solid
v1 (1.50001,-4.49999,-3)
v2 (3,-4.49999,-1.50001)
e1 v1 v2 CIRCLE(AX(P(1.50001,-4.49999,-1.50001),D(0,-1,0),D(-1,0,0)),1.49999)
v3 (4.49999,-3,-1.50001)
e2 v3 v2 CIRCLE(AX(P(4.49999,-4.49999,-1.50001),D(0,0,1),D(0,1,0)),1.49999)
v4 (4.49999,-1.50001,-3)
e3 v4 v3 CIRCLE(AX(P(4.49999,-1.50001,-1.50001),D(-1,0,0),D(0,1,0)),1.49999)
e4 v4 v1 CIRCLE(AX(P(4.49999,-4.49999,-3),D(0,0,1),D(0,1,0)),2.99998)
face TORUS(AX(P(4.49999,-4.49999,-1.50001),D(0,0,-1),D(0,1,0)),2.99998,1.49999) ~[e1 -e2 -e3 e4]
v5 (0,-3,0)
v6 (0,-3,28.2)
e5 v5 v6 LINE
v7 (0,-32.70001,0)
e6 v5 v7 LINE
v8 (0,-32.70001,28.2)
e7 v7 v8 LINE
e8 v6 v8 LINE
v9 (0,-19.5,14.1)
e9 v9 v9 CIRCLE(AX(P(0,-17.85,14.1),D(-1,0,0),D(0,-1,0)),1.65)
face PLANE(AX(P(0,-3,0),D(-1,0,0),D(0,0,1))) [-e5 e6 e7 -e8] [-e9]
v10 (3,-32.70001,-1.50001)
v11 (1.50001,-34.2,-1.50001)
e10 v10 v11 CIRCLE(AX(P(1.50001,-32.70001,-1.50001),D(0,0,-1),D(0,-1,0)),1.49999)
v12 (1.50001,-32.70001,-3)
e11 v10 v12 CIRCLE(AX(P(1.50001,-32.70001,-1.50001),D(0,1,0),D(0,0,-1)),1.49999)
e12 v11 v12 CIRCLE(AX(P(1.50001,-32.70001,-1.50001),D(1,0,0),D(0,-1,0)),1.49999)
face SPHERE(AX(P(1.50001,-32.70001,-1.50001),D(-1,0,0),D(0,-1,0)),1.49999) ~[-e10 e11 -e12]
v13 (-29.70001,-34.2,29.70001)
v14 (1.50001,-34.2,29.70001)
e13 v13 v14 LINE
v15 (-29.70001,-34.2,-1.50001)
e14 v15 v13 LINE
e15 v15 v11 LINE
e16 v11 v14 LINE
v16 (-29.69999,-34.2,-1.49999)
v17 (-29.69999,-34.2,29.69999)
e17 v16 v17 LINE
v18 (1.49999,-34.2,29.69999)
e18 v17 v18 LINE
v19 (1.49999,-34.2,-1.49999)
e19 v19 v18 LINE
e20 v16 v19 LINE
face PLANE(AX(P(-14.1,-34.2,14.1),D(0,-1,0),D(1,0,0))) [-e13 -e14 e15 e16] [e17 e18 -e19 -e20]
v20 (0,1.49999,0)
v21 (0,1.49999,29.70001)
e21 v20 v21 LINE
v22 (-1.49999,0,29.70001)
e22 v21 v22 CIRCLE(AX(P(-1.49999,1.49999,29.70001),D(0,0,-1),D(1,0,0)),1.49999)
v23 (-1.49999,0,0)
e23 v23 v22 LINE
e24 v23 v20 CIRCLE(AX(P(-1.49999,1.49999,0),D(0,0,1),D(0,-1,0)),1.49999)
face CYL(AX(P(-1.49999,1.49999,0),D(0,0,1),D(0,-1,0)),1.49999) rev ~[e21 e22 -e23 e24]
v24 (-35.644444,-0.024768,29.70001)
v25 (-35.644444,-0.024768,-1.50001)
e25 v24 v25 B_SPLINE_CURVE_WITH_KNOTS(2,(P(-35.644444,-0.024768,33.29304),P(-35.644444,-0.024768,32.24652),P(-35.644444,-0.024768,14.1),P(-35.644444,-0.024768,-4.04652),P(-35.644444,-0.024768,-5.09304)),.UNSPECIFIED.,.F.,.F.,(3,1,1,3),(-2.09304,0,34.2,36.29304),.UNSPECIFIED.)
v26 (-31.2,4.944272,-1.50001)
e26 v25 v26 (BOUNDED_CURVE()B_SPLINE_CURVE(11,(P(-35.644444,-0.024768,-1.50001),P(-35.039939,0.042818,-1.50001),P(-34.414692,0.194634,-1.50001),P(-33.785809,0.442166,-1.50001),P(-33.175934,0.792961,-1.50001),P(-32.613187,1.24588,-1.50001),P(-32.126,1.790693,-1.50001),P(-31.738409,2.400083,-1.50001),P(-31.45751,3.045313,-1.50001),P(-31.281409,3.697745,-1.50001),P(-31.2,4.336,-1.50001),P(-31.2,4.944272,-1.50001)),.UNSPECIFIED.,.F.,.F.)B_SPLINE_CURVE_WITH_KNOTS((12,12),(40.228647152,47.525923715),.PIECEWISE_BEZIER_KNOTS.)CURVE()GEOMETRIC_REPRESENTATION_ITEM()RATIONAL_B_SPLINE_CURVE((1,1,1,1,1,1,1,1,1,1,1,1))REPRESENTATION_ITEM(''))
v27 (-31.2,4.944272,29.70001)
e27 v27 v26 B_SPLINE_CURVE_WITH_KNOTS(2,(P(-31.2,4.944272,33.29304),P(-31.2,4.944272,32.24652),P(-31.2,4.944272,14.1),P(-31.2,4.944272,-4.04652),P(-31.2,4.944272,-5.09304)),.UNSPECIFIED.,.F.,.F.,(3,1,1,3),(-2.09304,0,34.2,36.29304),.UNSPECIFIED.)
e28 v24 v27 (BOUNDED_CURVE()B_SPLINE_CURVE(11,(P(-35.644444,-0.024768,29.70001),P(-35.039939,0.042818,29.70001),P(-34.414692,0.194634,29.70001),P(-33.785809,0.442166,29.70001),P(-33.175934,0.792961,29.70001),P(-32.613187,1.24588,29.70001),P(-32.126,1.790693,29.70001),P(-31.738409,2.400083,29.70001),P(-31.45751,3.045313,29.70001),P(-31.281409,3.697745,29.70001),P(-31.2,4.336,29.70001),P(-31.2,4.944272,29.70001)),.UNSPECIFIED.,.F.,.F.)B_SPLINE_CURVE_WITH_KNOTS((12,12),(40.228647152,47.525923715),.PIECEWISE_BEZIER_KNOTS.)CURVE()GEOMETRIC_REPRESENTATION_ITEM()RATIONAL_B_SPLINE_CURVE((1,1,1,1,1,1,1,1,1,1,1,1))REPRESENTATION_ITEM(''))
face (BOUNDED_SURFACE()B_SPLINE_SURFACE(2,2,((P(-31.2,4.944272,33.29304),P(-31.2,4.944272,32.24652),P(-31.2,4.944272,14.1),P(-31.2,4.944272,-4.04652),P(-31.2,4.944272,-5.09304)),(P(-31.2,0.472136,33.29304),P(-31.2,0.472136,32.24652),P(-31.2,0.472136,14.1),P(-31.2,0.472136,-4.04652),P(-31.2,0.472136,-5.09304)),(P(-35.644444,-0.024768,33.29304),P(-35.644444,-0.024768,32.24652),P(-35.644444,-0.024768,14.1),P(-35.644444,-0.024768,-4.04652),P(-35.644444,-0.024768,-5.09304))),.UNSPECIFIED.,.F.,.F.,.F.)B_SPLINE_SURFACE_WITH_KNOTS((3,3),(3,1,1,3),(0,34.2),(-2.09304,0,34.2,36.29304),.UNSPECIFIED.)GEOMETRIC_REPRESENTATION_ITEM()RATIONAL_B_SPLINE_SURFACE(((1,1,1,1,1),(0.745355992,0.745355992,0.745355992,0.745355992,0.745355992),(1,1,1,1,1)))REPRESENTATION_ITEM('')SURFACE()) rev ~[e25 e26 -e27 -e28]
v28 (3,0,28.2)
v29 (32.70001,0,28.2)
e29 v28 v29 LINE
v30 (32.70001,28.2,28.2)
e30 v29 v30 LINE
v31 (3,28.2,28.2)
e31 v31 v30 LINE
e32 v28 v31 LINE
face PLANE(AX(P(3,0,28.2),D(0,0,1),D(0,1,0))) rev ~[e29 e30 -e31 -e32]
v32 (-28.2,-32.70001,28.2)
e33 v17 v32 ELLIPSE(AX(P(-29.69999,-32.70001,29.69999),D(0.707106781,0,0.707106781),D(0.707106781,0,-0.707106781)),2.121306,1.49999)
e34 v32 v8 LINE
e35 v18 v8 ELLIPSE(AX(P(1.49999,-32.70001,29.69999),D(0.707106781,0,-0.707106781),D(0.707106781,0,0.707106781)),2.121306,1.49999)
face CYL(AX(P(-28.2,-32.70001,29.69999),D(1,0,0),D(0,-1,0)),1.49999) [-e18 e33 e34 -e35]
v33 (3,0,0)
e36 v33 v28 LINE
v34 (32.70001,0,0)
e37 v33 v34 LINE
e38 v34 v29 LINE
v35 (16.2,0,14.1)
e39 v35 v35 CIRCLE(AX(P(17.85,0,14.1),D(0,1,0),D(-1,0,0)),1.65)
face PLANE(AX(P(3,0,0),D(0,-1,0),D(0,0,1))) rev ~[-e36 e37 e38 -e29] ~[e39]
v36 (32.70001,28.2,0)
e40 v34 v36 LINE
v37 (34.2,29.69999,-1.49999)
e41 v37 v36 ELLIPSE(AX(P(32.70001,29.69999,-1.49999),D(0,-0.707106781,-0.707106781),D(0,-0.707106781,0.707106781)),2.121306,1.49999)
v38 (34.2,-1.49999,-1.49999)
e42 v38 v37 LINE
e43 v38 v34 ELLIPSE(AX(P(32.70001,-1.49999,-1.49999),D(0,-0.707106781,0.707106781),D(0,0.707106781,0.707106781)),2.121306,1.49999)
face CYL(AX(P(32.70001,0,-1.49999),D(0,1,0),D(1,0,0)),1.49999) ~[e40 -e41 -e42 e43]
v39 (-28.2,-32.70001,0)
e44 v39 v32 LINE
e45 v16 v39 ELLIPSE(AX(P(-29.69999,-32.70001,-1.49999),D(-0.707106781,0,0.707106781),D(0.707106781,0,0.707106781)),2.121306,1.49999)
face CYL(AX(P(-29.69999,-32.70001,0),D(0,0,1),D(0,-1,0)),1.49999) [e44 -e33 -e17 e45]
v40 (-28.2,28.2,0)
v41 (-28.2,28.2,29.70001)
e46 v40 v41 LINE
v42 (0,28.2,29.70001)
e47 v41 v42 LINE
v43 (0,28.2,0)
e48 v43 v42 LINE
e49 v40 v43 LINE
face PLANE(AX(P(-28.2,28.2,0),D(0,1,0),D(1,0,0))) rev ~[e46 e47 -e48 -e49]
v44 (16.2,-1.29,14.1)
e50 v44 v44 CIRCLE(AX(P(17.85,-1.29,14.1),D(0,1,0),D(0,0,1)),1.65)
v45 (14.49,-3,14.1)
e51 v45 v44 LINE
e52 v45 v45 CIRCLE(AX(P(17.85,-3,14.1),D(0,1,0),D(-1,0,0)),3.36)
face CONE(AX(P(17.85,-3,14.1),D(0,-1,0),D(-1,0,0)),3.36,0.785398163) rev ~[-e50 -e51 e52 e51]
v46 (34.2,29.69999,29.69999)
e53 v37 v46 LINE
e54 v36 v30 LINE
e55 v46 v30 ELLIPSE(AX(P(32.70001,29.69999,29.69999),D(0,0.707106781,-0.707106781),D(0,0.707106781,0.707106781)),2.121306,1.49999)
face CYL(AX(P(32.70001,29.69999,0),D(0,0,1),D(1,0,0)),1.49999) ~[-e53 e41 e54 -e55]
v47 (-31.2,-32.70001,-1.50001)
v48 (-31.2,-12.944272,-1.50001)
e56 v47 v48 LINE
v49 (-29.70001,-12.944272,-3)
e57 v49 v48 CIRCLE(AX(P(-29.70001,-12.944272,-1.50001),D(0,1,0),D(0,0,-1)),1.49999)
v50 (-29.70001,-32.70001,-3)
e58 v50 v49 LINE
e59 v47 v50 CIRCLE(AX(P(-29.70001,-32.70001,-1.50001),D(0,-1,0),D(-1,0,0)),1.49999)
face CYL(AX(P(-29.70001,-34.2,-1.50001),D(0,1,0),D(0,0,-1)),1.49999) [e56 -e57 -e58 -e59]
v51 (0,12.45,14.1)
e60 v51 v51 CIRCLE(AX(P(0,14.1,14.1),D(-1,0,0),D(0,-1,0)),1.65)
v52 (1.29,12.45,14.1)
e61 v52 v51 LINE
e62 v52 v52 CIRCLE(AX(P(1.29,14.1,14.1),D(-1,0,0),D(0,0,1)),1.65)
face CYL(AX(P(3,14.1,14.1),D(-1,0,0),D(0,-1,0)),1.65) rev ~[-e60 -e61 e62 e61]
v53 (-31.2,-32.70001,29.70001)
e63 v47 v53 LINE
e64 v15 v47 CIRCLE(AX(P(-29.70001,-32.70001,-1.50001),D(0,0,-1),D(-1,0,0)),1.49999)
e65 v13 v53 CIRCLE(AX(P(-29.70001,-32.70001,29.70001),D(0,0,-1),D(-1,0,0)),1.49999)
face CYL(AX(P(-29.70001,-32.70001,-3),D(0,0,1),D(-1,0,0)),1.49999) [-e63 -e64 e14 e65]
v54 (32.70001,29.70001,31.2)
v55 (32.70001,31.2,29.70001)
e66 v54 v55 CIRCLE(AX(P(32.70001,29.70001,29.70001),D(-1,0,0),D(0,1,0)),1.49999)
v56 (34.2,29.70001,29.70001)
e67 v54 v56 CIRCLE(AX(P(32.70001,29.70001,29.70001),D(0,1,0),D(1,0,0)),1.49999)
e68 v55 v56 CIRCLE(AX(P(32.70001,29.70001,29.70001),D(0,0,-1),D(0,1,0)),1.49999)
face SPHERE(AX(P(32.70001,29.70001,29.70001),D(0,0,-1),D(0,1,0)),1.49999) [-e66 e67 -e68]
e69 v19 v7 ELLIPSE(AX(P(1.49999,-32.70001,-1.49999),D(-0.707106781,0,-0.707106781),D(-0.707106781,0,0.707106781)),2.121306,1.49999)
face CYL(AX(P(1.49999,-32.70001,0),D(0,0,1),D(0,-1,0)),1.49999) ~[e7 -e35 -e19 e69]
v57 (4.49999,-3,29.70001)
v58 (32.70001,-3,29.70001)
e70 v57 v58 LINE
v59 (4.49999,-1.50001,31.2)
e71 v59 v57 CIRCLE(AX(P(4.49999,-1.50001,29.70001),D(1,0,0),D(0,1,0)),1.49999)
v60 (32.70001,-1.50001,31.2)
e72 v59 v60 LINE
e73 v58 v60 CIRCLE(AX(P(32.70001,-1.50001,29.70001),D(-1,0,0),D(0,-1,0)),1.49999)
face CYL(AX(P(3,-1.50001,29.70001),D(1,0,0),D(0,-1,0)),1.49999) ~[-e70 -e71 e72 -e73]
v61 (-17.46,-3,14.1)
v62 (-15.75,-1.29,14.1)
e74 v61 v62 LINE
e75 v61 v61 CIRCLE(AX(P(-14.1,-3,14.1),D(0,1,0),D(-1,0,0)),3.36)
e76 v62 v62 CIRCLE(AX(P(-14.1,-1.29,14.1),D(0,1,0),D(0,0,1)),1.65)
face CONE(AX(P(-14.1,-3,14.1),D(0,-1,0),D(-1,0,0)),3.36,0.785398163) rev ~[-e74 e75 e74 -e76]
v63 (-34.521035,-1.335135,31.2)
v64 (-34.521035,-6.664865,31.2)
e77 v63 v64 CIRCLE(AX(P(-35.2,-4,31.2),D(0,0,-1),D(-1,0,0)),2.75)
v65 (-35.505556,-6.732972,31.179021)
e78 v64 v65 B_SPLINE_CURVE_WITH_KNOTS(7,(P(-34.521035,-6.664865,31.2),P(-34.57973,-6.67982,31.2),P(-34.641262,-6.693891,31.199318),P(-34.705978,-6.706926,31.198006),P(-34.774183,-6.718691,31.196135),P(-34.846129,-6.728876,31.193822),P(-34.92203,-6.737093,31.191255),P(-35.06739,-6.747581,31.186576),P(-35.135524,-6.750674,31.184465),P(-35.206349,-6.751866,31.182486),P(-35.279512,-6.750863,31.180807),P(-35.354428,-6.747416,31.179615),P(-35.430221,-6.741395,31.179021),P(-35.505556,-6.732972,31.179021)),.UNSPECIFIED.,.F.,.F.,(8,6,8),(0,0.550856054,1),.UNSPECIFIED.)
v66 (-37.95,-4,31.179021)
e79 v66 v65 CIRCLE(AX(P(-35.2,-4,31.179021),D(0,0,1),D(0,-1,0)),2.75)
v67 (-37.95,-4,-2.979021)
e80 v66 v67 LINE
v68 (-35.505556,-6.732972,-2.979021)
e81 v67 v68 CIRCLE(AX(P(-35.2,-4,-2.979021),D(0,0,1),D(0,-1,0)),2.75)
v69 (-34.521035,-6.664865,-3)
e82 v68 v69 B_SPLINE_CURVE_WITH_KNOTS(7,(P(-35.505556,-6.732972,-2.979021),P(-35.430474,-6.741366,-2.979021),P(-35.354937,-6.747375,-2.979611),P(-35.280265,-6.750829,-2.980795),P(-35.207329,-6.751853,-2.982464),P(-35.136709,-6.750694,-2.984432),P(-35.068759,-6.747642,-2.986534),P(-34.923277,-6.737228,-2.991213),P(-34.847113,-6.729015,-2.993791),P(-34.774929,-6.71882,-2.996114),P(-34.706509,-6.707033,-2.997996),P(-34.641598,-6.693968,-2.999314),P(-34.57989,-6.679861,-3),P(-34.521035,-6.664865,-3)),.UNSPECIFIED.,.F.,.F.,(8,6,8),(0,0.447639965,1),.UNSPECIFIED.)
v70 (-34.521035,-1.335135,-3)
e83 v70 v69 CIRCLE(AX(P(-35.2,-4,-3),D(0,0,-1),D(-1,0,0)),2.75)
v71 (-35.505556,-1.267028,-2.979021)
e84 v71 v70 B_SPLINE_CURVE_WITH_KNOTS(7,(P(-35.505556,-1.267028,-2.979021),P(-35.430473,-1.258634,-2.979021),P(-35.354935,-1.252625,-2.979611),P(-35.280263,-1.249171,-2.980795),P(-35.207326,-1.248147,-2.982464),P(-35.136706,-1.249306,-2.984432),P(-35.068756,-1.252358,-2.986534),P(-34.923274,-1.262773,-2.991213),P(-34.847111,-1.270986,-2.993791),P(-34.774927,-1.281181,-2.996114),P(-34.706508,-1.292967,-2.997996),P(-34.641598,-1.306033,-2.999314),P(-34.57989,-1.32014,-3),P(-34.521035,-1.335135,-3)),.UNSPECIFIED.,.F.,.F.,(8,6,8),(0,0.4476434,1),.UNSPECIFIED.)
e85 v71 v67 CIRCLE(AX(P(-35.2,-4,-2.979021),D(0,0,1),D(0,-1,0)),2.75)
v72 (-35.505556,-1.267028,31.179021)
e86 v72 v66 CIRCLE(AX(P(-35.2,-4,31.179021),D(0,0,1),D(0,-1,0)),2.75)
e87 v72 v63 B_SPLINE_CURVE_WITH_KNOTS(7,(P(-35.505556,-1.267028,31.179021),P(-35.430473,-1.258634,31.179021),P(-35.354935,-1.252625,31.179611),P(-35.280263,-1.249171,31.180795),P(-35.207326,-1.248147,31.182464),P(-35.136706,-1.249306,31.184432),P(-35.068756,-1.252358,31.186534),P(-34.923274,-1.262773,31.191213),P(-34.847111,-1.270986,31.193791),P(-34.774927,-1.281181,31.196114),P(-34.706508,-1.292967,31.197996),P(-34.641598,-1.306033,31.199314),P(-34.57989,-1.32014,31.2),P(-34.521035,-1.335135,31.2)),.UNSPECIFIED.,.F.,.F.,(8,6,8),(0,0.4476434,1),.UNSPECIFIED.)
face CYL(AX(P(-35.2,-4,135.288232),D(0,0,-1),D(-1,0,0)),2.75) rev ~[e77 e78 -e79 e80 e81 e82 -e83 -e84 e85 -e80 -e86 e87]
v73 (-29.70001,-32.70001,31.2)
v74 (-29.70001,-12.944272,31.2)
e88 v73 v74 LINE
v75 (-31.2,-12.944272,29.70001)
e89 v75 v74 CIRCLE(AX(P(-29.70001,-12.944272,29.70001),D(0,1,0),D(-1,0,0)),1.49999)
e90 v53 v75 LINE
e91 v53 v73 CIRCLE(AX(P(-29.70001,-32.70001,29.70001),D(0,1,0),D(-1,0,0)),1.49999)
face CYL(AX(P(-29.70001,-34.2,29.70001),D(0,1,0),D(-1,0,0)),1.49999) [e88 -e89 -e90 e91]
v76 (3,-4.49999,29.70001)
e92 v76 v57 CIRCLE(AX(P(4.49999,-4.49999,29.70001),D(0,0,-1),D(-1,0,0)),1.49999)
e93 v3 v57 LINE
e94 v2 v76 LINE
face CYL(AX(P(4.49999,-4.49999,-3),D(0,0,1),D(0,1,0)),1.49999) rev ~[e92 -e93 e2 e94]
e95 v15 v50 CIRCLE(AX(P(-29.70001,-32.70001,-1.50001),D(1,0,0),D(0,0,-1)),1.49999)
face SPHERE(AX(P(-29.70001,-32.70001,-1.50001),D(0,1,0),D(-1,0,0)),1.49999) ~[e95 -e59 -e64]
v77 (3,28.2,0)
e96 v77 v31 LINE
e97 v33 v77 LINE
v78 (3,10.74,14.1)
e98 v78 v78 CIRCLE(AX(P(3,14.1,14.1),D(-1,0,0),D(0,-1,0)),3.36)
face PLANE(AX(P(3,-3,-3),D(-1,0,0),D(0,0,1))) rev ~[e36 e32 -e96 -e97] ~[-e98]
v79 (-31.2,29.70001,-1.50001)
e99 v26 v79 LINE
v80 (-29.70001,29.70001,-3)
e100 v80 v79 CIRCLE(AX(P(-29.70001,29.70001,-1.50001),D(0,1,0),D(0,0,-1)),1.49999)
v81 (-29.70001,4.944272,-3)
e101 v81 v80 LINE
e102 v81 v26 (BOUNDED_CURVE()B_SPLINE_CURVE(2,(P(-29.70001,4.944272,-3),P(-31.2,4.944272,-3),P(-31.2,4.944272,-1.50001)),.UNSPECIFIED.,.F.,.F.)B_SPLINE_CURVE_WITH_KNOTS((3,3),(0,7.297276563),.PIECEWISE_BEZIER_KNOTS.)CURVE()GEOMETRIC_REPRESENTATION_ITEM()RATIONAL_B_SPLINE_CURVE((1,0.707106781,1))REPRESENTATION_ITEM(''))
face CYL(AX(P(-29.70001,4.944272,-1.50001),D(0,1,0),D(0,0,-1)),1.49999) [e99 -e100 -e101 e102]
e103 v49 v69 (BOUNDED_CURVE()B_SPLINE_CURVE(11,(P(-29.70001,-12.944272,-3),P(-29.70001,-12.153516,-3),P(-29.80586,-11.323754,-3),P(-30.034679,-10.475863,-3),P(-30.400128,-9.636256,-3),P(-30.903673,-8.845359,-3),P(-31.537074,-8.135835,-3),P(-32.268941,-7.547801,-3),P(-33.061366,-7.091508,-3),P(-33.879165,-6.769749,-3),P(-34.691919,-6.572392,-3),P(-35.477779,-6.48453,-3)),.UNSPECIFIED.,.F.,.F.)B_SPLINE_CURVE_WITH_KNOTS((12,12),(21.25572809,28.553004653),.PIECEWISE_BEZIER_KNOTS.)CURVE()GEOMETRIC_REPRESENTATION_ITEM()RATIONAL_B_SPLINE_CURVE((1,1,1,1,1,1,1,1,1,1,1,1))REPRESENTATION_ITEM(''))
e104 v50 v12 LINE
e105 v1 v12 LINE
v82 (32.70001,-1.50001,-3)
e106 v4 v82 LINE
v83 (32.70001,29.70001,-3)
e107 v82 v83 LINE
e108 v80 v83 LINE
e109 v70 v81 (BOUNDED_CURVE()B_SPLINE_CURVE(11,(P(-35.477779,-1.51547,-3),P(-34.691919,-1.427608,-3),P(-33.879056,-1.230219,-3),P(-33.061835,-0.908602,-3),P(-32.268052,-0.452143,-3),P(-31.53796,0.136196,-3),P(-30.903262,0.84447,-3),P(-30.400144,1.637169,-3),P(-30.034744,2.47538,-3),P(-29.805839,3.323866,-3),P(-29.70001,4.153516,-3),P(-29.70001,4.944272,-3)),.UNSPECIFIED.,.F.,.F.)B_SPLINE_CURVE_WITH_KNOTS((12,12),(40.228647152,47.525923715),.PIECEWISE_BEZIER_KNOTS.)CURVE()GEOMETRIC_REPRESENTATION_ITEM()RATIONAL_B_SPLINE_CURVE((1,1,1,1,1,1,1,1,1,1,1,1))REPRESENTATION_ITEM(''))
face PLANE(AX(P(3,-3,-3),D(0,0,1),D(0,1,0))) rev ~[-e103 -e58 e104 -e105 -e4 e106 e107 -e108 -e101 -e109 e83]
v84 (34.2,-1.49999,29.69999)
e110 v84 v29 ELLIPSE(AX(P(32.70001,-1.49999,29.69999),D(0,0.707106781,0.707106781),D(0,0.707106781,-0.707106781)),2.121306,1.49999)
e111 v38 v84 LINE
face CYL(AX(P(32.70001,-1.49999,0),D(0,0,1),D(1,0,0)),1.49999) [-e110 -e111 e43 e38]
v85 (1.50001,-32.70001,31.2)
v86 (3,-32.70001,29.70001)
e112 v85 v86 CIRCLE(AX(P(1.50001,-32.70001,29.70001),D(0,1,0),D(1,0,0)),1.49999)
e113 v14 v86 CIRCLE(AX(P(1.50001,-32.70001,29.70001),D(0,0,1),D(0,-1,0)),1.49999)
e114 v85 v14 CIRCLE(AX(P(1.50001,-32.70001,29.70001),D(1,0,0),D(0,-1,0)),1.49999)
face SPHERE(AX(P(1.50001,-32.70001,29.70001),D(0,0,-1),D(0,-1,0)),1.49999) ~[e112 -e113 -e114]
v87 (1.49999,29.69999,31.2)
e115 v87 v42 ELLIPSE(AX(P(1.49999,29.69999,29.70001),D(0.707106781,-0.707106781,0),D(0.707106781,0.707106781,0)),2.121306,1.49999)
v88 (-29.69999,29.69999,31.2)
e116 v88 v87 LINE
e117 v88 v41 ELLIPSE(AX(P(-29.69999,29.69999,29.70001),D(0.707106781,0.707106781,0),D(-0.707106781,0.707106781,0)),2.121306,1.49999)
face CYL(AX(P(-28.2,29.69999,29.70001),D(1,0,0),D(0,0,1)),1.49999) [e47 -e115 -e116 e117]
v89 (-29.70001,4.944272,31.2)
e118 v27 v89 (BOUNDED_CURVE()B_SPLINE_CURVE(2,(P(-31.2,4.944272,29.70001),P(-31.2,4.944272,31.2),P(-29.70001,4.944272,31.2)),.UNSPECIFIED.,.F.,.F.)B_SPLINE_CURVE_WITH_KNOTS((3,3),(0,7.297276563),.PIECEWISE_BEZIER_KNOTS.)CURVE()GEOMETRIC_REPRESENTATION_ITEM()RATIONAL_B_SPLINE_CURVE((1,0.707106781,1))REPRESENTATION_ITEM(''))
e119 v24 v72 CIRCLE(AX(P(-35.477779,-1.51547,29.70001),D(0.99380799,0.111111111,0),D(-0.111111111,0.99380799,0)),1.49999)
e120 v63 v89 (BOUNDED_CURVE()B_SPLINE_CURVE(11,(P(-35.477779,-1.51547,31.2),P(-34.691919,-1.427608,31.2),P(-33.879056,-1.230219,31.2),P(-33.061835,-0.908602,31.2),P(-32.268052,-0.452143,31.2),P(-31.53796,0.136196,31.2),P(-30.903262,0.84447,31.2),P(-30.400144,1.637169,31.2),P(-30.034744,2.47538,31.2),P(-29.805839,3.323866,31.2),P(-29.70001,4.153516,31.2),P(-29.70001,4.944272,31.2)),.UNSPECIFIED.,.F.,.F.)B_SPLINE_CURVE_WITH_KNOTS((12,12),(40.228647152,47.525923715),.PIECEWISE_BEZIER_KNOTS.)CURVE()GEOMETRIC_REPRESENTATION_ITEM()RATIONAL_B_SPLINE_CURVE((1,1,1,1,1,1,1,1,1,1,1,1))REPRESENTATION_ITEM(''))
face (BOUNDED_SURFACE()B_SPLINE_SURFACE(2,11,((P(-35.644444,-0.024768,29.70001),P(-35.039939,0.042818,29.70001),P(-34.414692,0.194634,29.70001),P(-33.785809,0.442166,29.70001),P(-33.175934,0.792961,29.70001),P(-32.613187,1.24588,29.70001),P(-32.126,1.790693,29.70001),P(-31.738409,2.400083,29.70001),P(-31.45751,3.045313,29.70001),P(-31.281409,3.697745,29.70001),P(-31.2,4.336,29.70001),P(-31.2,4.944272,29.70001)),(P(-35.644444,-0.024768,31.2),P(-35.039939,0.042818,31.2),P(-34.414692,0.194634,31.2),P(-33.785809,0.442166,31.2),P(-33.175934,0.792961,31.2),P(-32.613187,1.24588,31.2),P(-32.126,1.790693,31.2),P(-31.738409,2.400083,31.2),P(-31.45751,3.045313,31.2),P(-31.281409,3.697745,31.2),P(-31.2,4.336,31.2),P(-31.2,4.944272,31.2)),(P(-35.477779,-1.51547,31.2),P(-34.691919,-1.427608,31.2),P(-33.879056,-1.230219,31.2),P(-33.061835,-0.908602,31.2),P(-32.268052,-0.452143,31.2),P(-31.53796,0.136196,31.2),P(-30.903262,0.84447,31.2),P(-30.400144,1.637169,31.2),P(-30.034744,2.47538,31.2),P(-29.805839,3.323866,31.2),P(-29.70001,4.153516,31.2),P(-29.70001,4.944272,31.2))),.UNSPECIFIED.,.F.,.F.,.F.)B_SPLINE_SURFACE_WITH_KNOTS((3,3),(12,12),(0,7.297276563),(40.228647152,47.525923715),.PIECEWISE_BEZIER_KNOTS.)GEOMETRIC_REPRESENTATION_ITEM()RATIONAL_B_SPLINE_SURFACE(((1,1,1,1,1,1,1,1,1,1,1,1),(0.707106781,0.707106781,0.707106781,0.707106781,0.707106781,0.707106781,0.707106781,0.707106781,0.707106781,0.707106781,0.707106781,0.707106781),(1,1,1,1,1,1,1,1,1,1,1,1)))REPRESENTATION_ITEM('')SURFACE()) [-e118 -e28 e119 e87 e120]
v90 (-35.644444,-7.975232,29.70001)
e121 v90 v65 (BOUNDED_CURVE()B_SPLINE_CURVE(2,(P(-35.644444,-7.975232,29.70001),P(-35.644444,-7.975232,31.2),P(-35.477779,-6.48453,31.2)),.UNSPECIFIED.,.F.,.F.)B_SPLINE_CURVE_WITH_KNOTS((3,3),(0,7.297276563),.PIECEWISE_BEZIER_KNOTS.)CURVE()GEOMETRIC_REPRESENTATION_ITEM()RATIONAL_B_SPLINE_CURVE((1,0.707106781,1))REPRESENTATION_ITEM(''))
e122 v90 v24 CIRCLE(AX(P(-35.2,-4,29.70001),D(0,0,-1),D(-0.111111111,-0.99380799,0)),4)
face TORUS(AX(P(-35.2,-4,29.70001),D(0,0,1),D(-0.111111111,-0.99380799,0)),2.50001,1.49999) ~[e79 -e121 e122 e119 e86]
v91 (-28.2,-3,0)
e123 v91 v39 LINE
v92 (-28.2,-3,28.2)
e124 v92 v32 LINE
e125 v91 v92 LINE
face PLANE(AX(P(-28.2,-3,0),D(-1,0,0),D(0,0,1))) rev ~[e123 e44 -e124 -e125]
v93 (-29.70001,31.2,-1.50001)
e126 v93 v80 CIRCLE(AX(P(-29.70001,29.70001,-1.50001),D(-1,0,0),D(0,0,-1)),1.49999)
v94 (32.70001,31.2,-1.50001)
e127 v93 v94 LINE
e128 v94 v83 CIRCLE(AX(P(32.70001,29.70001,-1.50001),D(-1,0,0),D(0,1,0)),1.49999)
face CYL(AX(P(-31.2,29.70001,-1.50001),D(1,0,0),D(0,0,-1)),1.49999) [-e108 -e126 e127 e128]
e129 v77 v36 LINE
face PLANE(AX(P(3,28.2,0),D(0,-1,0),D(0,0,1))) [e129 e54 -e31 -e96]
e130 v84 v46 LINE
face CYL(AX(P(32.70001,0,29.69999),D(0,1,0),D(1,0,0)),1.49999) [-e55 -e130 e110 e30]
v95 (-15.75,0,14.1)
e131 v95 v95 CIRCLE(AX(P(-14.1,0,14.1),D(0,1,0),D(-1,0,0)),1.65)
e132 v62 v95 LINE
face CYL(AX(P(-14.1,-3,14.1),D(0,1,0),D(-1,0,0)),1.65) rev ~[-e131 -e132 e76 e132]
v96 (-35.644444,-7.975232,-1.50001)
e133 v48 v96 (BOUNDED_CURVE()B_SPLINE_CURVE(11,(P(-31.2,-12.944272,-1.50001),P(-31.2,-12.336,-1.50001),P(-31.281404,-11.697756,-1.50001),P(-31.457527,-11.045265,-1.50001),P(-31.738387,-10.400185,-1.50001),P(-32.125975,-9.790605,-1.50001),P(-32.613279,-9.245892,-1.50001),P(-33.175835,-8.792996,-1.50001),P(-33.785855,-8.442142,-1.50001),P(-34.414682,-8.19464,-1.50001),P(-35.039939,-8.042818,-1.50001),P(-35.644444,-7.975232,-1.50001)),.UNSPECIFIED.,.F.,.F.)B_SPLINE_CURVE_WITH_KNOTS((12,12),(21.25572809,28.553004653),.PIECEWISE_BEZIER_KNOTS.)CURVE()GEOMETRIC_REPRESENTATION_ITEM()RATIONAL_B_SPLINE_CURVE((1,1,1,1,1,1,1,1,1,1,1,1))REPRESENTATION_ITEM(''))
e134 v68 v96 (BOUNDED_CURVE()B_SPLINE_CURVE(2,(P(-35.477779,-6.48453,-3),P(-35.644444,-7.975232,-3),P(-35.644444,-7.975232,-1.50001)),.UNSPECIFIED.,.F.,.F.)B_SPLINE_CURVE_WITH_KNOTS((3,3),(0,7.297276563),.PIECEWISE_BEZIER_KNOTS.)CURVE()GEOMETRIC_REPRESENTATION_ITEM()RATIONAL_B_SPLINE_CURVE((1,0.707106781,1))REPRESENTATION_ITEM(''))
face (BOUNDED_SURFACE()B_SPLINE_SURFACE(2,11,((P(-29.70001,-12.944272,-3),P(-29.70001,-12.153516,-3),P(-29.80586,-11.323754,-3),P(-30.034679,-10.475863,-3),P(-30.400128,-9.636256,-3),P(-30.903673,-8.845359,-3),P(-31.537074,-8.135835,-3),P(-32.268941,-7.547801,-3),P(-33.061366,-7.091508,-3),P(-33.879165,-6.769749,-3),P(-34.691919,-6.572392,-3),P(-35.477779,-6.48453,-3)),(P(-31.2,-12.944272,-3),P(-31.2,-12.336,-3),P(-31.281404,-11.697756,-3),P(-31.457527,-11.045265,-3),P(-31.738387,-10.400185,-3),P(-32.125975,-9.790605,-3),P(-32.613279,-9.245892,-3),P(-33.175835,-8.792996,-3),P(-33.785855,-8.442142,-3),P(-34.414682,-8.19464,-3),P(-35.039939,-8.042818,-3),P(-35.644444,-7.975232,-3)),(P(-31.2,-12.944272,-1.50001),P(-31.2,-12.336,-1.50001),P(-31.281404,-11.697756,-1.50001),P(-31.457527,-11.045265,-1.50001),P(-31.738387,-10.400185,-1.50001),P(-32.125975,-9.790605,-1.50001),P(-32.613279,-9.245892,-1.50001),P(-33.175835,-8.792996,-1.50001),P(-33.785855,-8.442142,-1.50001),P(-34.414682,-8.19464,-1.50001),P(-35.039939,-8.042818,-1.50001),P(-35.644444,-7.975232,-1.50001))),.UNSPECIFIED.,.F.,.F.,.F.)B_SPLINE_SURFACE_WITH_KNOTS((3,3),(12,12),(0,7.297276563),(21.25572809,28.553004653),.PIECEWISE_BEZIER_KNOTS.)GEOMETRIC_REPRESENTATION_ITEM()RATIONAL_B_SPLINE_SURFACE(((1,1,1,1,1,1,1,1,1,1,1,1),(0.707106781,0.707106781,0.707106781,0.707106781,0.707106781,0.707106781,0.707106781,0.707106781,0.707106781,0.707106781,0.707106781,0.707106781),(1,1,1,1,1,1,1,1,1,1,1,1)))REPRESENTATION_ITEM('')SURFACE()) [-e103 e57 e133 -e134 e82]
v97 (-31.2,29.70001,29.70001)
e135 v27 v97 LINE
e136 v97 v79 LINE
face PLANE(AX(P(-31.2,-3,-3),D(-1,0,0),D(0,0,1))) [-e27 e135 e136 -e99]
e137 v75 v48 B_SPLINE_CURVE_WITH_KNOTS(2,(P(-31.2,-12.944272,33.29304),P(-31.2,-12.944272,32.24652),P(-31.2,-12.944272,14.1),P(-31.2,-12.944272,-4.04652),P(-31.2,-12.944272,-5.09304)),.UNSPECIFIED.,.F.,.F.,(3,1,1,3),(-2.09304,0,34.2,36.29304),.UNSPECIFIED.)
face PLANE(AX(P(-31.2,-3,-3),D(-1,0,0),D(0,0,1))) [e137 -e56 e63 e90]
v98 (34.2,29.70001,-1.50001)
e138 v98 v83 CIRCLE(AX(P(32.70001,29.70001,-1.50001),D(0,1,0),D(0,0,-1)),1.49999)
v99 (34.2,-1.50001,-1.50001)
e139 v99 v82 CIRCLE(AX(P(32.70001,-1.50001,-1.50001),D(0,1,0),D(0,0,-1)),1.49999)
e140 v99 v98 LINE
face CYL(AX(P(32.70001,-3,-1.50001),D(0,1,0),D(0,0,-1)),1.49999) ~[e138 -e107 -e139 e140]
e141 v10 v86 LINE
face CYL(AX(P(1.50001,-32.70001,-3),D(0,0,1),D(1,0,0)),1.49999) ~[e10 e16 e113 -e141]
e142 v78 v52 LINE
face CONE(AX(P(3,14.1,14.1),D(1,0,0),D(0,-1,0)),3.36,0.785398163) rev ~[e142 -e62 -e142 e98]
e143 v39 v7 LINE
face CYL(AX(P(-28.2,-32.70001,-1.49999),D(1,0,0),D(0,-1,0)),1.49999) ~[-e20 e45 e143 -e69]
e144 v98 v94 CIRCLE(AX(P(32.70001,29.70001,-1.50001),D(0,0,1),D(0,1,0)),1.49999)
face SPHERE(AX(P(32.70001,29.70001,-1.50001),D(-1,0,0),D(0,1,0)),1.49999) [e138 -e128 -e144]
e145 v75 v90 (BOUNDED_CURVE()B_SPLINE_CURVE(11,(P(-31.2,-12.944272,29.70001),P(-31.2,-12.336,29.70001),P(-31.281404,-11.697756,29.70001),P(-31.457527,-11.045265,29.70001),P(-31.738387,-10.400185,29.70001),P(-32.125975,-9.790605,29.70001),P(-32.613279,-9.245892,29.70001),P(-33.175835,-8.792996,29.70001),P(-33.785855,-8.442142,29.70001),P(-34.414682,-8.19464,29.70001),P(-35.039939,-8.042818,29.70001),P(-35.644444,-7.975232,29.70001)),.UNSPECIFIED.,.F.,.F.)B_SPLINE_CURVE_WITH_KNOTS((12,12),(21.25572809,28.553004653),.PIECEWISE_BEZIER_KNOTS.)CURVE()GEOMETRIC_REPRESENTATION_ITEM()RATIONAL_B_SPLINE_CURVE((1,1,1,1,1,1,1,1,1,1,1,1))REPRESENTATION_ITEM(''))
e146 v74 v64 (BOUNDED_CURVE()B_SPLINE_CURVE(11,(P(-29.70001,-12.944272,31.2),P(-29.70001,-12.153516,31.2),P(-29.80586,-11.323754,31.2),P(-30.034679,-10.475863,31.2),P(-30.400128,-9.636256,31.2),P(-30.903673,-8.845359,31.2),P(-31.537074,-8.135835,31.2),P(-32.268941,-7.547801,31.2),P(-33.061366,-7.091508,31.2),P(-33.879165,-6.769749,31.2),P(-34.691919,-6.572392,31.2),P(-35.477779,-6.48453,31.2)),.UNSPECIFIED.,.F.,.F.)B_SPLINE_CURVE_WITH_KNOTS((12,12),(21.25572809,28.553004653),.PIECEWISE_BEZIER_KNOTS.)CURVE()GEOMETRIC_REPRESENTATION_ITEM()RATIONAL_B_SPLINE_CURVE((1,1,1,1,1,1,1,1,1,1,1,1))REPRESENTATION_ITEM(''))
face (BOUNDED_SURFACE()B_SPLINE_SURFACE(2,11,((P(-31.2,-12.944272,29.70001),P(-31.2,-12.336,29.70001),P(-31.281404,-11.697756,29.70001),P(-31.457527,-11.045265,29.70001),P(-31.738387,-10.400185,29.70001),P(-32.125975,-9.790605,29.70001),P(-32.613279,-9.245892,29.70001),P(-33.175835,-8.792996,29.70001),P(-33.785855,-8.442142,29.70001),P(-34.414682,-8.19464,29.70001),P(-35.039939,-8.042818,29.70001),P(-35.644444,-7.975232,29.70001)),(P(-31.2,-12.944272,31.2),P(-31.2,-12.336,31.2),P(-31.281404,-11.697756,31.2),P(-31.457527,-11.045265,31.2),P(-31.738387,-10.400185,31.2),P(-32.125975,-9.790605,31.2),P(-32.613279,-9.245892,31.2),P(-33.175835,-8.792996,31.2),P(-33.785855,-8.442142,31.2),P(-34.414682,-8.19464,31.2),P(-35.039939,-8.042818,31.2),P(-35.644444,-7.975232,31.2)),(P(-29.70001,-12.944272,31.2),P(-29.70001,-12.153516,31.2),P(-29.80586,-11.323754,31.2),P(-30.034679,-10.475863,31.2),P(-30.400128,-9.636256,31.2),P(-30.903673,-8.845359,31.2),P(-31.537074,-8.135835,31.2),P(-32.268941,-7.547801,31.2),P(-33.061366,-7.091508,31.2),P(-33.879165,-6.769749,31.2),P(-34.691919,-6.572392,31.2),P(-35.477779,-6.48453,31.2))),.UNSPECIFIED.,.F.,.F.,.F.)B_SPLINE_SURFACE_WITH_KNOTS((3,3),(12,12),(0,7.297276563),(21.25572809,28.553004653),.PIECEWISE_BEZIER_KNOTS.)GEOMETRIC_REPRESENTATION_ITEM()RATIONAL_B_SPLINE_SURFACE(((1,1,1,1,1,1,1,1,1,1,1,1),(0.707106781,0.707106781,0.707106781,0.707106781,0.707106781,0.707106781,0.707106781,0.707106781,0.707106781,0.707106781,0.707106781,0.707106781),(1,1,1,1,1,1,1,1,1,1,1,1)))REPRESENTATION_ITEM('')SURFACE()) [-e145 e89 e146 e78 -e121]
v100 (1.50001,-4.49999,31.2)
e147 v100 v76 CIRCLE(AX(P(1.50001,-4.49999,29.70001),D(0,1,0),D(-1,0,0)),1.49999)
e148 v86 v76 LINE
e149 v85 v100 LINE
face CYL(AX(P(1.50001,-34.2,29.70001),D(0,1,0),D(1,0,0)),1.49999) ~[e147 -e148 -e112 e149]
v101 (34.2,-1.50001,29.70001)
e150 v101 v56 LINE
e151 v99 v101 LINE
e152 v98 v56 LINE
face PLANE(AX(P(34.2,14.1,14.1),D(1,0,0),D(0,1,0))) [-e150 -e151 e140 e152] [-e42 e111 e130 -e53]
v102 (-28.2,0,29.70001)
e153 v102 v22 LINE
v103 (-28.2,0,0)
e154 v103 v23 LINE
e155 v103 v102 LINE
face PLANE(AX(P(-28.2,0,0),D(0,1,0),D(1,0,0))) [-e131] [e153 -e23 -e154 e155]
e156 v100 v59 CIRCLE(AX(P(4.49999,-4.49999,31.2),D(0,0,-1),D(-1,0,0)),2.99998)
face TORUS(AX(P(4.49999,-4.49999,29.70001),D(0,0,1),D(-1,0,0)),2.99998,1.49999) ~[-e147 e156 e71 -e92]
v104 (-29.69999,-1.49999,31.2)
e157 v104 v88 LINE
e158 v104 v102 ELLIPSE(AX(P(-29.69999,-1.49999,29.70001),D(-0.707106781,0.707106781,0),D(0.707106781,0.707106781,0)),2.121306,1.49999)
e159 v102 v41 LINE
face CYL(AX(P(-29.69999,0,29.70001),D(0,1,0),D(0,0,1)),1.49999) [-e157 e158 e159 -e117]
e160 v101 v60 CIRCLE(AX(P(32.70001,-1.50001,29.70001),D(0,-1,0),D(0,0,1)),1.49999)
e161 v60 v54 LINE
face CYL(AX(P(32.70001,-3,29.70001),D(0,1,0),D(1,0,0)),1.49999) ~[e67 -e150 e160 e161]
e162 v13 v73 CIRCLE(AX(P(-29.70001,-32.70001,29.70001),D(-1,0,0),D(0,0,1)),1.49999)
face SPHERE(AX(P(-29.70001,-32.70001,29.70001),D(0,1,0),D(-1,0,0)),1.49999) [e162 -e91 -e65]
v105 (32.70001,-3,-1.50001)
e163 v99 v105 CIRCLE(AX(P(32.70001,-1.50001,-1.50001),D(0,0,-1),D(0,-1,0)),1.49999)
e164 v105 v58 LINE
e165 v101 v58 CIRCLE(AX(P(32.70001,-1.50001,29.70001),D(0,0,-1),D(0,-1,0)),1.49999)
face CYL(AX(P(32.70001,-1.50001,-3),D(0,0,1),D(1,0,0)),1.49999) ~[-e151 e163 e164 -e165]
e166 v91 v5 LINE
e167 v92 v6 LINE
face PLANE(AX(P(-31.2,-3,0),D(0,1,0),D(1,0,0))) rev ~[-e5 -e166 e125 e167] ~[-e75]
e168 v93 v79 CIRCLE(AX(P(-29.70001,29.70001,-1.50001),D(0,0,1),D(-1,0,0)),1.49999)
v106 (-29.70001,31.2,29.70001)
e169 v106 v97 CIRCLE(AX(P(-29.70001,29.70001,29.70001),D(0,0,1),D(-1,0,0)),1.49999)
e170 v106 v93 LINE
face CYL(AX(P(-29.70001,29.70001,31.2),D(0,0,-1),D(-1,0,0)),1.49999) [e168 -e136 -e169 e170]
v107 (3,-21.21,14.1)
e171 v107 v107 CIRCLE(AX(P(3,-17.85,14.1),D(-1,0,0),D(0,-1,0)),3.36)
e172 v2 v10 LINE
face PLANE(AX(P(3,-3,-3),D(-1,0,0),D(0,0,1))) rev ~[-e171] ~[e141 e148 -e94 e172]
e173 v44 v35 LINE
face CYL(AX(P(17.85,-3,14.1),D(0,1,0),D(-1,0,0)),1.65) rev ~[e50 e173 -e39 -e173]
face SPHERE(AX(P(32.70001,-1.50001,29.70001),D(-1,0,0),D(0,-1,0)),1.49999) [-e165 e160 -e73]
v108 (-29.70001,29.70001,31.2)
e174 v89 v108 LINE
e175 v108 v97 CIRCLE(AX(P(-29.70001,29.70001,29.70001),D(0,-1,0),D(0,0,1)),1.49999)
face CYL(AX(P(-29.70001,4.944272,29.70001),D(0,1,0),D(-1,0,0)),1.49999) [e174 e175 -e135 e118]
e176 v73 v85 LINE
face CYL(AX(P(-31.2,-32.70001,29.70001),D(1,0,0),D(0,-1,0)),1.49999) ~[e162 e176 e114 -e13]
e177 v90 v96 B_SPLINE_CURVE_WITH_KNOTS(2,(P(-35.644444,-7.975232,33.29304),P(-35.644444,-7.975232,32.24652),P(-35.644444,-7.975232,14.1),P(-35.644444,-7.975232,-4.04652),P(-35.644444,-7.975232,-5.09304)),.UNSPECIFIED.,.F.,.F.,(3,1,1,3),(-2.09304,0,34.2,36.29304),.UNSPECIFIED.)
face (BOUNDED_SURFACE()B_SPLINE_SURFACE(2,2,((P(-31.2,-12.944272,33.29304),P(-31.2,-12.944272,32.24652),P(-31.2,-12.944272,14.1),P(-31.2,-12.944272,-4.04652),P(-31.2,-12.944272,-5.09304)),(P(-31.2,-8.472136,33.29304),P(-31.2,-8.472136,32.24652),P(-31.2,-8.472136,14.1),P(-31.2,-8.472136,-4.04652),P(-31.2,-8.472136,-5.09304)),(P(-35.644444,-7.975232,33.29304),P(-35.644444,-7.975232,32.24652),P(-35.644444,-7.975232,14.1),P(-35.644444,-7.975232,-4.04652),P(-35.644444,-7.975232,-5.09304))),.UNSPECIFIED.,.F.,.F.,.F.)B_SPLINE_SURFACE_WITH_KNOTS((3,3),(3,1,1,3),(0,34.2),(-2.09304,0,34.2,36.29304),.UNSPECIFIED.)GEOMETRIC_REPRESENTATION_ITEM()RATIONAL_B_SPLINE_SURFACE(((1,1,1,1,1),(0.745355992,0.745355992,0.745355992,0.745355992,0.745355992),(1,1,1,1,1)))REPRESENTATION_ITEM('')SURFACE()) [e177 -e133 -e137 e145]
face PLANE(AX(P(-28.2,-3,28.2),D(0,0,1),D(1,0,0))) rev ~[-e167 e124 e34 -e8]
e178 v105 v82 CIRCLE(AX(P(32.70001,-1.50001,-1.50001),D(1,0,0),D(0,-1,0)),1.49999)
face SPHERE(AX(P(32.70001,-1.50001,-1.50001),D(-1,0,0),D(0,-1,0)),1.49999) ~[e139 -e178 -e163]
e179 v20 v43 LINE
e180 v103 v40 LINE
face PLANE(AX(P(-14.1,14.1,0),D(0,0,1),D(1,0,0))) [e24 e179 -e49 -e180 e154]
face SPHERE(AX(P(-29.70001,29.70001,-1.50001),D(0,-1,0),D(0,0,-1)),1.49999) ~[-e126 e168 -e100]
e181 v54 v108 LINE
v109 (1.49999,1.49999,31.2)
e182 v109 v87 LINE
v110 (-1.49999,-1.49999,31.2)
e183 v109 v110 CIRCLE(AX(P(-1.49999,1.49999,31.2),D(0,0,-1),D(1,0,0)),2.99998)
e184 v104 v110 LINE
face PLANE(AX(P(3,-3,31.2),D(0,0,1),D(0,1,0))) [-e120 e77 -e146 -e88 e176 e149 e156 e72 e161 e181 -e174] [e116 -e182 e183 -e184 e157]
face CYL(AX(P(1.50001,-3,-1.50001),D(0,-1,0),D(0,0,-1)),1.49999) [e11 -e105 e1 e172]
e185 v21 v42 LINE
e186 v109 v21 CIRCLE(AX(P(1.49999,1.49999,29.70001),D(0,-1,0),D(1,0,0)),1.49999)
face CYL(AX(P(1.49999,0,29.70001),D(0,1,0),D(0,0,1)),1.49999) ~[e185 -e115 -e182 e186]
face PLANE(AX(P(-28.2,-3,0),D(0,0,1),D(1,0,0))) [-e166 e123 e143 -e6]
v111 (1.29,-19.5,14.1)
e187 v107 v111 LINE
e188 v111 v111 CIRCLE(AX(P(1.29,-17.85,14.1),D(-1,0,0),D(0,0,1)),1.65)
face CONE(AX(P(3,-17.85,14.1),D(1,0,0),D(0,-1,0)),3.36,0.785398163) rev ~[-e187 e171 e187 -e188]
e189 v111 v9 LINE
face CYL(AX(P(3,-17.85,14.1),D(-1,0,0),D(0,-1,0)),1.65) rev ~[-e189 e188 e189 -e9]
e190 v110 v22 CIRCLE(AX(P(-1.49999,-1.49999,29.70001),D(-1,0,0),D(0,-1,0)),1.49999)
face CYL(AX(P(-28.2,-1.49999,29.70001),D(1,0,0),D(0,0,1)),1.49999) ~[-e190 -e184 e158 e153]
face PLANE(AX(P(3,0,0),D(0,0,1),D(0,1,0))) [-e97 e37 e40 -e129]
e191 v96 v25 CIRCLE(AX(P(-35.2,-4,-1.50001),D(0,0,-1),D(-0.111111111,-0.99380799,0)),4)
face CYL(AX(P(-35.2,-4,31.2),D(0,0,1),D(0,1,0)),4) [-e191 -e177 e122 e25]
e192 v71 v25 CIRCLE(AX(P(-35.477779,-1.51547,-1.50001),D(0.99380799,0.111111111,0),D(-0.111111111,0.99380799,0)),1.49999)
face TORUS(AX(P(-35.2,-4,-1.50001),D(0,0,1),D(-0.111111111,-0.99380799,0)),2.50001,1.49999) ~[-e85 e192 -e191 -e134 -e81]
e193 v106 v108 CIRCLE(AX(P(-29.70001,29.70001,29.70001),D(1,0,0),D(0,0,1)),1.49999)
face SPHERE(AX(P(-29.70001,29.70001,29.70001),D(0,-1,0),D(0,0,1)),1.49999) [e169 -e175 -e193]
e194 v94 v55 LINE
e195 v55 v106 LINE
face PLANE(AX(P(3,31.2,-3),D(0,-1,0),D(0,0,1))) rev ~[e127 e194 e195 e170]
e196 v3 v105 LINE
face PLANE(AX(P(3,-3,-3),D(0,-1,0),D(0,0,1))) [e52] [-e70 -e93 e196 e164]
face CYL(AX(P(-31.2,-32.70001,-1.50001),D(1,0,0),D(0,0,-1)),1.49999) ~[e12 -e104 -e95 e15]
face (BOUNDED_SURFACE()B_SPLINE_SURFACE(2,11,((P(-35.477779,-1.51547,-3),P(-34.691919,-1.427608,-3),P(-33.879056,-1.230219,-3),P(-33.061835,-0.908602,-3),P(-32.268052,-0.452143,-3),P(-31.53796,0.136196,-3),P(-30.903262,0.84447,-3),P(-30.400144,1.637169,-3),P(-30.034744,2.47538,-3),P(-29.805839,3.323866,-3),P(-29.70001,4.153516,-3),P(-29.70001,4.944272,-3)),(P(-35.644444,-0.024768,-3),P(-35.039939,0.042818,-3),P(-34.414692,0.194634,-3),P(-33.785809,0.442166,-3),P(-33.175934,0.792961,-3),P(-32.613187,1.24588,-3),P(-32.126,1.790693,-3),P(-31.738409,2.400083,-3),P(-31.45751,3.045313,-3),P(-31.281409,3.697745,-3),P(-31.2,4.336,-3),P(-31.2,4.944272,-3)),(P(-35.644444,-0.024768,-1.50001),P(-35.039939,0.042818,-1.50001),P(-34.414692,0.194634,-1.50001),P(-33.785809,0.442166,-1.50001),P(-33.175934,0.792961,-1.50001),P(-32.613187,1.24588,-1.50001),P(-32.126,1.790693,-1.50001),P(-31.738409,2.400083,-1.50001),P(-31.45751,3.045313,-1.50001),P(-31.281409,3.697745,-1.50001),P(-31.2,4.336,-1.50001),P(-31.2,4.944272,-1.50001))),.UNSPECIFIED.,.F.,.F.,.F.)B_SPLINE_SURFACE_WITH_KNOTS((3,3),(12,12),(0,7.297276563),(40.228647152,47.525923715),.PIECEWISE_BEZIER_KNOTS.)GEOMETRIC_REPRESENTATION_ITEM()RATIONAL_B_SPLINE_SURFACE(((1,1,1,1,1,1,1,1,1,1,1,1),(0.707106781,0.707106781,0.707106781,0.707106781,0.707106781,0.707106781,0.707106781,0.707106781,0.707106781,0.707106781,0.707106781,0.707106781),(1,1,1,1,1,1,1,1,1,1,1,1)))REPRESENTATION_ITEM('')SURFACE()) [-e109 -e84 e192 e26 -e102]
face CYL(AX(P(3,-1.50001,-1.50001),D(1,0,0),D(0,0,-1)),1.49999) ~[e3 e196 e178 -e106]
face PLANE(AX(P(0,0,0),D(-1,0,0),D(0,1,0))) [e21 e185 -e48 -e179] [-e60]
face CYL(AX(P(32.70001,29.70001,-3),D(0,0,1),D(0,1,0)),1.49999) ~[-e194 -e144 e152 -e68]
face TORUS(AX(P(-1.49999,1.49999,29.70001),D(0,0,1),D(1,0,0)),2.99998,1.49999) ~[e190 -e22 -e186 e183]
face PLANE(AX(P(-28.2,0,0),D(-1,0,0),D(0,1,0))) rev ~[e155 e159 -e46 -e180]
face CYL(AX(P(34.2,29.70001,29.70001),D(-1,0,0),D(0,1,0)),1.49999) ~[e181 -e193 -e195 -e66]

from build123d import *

# Parameters (mm, degrees)
F0_W                  = 34.2
F0_H                  = 34.2
F0_W_2                = 28.2
F0_H_2                = 28.2
F1_DEPTH              = 3
F2_DEPTH              = 31.2
F3_W                  = 34.2
F3_H                  = 34.2
F3_W_2                = 28.2
F3_H_2                = 28.2
F4_DEPTH              = 31.2
F5_W                  = 34.2
F5_H                  = 34.2
F5_W_2                = 28.2
F5_H_2                = 28.2
F6_DEPTH              = 31.2
F7_D                  = 3.3
F7_DEPTH              = 13.5
F7_CSINK_D            = 6.72
F7_CSINK_ANGLE        = 90
F7_TIP                = 0.9914200214
F7_ON_F3_D            = 3.3
F7_ON_F3_DEPTH        = 13.5
F7_ON_F3_CSINK_D      = 6.72
F7_ON_F3_CSINK_ANGLE  = 90
F7_ON_F3_TIP          = 0.9914200214
F10_D                 = 3.3
F10_DEPTH             = 13.5
F10_CSINK_D           = 6.72
F10_CSINK_ANGLE       = 90
F10_TIP               = 0.9914200214
F10_ON_F8_D           = 3.3
F10_ON_F8_DEPTH       = 13.5
F10_ON_F8_CSINK_D     = 6.72
F10_ON_F8_CSINK_ANGLE = 90
F10_ON_F8_TIP         = 0.9914200214
F12_DEPTH             = 34.2
F13_R                 = 5
F14_R                 = 1.49999
F15_D                 = 5.5


# Not quite as in the source:
# - a fillet or chamfer is up to 0.001 mm smaller than in the source, because OpenCascade refuses the exact size


with BuildPart() as f1:
    # F0 (on Top) → F1 (new body)
    with BuildSketch(Plane.XY):
        with Locations((-14.1, 14.1)):
            Rectangle(F0_W, F0_H)
        with Locations((-14.1, 14.1)):
            Rectangle(F0_W_2, F0_H_2, mode=Mode.SUBTRACT)
        with Locations((-14.1, 14.1)):
            Rectangle(F0_W_2, F0_H_2)
    extrude(amount=-F1_DEPTH)

    # F0 (on Top) → F2 (join)
    with BuildSketch(Plane.XY):
        with Locations((-14.1, 14.1)):
            Rectangle(F0_W, F0_H)
        with Locations((-14.1, 14.1)):
            Rectangle(F0_W_2, F0_H_2, mode=Mode.SUBTRACT)
    extrude(amount=F2_DEPTH)

    # F3 (on face) → F4 (join)
    with BuildSketch(Plane.XZ.offset(3)):
        with Locations((-14.1, 14.1)):
            Rectangle(F3_W, F3_H)
        with Locations((-14.1, 14.1)):
            Rectangle(F3_W_2, F3_H_2, mode=Mode.SUBTRACT)
    extrude(amount=F4_DEPTH)

    # F5 (on face) → F6 (join)
    with BuildSketch(Plane.YZ.offset(3)):
        with Locations((14.1, 14.1)):
            Rectangle(F5_W, F5_H)
        with Locations((14.1, 14.1)):
            Rectangle(F5_W_2, F5_H_2, mode=Mode.SUBTRACT)
    extrude(amount=F6_DEPTH)

    # F7
    with Locations(Plane.YZ.offset(3)):
        with Locations((14.1, 14.1)):
            CounterSinkHole(F7_D / 2, F7_CSINK_D / 2, depth=F7_DEPTH, counter_sink_angle=F7_CSINK_ANGLE)
            with Locations((0, 0, -(F7_DEPTH + F7_TIP / 2))):  # 118° drill point
                Cone(0, F7_D / 2, F7_TIP, mode=Mode.SUBTRACT)

    # F7 on F3
    with Locations(Plane.XZ.offset(3)):
        with Locations((-14.1, 14.1)):
            CounterSinkHole(F7_ON_F3_D / 2, F7_ON_F3_CSINK_D / 2, depth=F7_ON_F3_DEPTH, counter_sink_angle=F7_ON_F3_CSINK_ANGLE)
            with Locations((0, 0, -(F7_ON_F3_DEPTH + F7_ON_F3_TIP / 2))):  # 118° drill point
                Cone(0, F7_ON_F3_D / 2, F7_ON_F3_TIP, mode=Mode.SUBTRACT)

    # F10
    with Locations(Plane.XZ.offset(3)):
        with Locations((17.85, 14.1)):
            CounterSinkHole(F10_D / 2, F10_CSINK_D / 2, depth=F10_DEPTH, counter_sink_angle=F10_CSINK_ANGLE)
            with Locations((0, 0, -(F10_DEPTH + F10_TIP / 2))):  # 118° drill point
                Cone(0, F10_D / 2, F10_TIP, mode=Mode.SUBTRACT)

    # F10 on F8
    with Locations(Plane.YZ.offset(3)):
        with Locations((-17.85, 14.1)):
            CounterSinkHole(F10_ON_F8_D / 2, F10_ON_F8_CSINK_D / 2, depth=F10_ON_F8_DEPTH, counter_sink_angle=F10_ON_F8_CSINK_ANGLE)
            with Locations((0, 0, -(F10_ON_F8_DEPTH + F10_ON_F8_TIP / 2))):  # 118° drill point
                Cone(0, F10_ON_F8_D / 2, F10_ON_F8_TIP, mode=Mode.SUBTRACT)

    # F11 (on face) → F12 (join, through all)
    with BuildSketch(Plane.XY.offset(31.2)):
        with BuildLine():
            Line((-31.2, 0), (-35.2, 0))
            ThreePointArc((-35.2, 0), (-39.2, -4), (-35.2, -8))
            Line((-35.2, -8), (-31.2, -8))
            Line((-31.2, -8), (-31.2, 0))
        make_face()
    extrude(amount=-F12_DEPTH)

    # F13
    f13_edges = [f1.edges().sort_by_distance(p)[0] for p in [
        (-31.2, 0, 14.1),
        (-31.2, -8, 14.1),
    ]]
    fillet(f13_edges, radius=F13_R)

    # F14 (radius 1.5 in the source; OpenCascade refuses exactly that, so slightly less here)
    f14_edges = [f1.edges().sort_by_distance(p)[0] for p in [
        (-32.47322, -9.610939, -3),
        (-32.47322, -9.610939, 31.2),
        (1.5, 31.2, -3),
        (34.2, 31.2, 14.1),
        (1.5, 31.2, 31.2),
        (-31.2, 31.2, 14.1),
        (-31.2, -34.2, 14.1),
        (-14.1, -34.2, -3),
        (3, -34.2, 14.1),
        (-14.1, -34.2, 31.2),
        (-14.1, -34.2, 28.2),
        (0, -34.2, 14.1),
        (-14.1, -34.2, 0),
        (-28.2, -34.2, 14.1),
        (3, -18.6, -3),
        (3, -3, 14.1),
        (18.6, -3, -3),
        (3, -18.6, 31.2),
        (18.6, -3, 31.2),
        (34.2, -3, 14.1),
        (34.2, 14.1, -3),
        (34.2, 28.2, 14.1),
        (34.2, 14.1, 28.2),
        (34.2, 14.1, 31.2),
        (34.2, 14.1, 0),
        (34.2, 0, 14.1),
        (-14.1, 0, 31.2),
        (-28.2, 14.1, 31.2),
        (-14.1, 28.2, 31.2),
        (0, 0, 15.6),
        (-31.2, 18.072136, 31.2),
        (-31.2, 18.072136, -3),
        (-31.2, -23.572136, 31.2),
        (-39.2, -4, 31.2),
        (-32.47322, 1.610939, 31.2),
        (0, 14.1, 31.2),
        (-32.47322, 1.610939, -3),
        (-39.2, -4, -3),
        (-31.2, -23.572136, -3),
    ]]
    fillet(f14_edges, radius=F14_R)

    # F15 (through all)
    with Locations(Plane.XY.offset(31.2)):
        with Locations((-35.2, -4)):
            Hole(F15_D / 2)


solid = f1.part
